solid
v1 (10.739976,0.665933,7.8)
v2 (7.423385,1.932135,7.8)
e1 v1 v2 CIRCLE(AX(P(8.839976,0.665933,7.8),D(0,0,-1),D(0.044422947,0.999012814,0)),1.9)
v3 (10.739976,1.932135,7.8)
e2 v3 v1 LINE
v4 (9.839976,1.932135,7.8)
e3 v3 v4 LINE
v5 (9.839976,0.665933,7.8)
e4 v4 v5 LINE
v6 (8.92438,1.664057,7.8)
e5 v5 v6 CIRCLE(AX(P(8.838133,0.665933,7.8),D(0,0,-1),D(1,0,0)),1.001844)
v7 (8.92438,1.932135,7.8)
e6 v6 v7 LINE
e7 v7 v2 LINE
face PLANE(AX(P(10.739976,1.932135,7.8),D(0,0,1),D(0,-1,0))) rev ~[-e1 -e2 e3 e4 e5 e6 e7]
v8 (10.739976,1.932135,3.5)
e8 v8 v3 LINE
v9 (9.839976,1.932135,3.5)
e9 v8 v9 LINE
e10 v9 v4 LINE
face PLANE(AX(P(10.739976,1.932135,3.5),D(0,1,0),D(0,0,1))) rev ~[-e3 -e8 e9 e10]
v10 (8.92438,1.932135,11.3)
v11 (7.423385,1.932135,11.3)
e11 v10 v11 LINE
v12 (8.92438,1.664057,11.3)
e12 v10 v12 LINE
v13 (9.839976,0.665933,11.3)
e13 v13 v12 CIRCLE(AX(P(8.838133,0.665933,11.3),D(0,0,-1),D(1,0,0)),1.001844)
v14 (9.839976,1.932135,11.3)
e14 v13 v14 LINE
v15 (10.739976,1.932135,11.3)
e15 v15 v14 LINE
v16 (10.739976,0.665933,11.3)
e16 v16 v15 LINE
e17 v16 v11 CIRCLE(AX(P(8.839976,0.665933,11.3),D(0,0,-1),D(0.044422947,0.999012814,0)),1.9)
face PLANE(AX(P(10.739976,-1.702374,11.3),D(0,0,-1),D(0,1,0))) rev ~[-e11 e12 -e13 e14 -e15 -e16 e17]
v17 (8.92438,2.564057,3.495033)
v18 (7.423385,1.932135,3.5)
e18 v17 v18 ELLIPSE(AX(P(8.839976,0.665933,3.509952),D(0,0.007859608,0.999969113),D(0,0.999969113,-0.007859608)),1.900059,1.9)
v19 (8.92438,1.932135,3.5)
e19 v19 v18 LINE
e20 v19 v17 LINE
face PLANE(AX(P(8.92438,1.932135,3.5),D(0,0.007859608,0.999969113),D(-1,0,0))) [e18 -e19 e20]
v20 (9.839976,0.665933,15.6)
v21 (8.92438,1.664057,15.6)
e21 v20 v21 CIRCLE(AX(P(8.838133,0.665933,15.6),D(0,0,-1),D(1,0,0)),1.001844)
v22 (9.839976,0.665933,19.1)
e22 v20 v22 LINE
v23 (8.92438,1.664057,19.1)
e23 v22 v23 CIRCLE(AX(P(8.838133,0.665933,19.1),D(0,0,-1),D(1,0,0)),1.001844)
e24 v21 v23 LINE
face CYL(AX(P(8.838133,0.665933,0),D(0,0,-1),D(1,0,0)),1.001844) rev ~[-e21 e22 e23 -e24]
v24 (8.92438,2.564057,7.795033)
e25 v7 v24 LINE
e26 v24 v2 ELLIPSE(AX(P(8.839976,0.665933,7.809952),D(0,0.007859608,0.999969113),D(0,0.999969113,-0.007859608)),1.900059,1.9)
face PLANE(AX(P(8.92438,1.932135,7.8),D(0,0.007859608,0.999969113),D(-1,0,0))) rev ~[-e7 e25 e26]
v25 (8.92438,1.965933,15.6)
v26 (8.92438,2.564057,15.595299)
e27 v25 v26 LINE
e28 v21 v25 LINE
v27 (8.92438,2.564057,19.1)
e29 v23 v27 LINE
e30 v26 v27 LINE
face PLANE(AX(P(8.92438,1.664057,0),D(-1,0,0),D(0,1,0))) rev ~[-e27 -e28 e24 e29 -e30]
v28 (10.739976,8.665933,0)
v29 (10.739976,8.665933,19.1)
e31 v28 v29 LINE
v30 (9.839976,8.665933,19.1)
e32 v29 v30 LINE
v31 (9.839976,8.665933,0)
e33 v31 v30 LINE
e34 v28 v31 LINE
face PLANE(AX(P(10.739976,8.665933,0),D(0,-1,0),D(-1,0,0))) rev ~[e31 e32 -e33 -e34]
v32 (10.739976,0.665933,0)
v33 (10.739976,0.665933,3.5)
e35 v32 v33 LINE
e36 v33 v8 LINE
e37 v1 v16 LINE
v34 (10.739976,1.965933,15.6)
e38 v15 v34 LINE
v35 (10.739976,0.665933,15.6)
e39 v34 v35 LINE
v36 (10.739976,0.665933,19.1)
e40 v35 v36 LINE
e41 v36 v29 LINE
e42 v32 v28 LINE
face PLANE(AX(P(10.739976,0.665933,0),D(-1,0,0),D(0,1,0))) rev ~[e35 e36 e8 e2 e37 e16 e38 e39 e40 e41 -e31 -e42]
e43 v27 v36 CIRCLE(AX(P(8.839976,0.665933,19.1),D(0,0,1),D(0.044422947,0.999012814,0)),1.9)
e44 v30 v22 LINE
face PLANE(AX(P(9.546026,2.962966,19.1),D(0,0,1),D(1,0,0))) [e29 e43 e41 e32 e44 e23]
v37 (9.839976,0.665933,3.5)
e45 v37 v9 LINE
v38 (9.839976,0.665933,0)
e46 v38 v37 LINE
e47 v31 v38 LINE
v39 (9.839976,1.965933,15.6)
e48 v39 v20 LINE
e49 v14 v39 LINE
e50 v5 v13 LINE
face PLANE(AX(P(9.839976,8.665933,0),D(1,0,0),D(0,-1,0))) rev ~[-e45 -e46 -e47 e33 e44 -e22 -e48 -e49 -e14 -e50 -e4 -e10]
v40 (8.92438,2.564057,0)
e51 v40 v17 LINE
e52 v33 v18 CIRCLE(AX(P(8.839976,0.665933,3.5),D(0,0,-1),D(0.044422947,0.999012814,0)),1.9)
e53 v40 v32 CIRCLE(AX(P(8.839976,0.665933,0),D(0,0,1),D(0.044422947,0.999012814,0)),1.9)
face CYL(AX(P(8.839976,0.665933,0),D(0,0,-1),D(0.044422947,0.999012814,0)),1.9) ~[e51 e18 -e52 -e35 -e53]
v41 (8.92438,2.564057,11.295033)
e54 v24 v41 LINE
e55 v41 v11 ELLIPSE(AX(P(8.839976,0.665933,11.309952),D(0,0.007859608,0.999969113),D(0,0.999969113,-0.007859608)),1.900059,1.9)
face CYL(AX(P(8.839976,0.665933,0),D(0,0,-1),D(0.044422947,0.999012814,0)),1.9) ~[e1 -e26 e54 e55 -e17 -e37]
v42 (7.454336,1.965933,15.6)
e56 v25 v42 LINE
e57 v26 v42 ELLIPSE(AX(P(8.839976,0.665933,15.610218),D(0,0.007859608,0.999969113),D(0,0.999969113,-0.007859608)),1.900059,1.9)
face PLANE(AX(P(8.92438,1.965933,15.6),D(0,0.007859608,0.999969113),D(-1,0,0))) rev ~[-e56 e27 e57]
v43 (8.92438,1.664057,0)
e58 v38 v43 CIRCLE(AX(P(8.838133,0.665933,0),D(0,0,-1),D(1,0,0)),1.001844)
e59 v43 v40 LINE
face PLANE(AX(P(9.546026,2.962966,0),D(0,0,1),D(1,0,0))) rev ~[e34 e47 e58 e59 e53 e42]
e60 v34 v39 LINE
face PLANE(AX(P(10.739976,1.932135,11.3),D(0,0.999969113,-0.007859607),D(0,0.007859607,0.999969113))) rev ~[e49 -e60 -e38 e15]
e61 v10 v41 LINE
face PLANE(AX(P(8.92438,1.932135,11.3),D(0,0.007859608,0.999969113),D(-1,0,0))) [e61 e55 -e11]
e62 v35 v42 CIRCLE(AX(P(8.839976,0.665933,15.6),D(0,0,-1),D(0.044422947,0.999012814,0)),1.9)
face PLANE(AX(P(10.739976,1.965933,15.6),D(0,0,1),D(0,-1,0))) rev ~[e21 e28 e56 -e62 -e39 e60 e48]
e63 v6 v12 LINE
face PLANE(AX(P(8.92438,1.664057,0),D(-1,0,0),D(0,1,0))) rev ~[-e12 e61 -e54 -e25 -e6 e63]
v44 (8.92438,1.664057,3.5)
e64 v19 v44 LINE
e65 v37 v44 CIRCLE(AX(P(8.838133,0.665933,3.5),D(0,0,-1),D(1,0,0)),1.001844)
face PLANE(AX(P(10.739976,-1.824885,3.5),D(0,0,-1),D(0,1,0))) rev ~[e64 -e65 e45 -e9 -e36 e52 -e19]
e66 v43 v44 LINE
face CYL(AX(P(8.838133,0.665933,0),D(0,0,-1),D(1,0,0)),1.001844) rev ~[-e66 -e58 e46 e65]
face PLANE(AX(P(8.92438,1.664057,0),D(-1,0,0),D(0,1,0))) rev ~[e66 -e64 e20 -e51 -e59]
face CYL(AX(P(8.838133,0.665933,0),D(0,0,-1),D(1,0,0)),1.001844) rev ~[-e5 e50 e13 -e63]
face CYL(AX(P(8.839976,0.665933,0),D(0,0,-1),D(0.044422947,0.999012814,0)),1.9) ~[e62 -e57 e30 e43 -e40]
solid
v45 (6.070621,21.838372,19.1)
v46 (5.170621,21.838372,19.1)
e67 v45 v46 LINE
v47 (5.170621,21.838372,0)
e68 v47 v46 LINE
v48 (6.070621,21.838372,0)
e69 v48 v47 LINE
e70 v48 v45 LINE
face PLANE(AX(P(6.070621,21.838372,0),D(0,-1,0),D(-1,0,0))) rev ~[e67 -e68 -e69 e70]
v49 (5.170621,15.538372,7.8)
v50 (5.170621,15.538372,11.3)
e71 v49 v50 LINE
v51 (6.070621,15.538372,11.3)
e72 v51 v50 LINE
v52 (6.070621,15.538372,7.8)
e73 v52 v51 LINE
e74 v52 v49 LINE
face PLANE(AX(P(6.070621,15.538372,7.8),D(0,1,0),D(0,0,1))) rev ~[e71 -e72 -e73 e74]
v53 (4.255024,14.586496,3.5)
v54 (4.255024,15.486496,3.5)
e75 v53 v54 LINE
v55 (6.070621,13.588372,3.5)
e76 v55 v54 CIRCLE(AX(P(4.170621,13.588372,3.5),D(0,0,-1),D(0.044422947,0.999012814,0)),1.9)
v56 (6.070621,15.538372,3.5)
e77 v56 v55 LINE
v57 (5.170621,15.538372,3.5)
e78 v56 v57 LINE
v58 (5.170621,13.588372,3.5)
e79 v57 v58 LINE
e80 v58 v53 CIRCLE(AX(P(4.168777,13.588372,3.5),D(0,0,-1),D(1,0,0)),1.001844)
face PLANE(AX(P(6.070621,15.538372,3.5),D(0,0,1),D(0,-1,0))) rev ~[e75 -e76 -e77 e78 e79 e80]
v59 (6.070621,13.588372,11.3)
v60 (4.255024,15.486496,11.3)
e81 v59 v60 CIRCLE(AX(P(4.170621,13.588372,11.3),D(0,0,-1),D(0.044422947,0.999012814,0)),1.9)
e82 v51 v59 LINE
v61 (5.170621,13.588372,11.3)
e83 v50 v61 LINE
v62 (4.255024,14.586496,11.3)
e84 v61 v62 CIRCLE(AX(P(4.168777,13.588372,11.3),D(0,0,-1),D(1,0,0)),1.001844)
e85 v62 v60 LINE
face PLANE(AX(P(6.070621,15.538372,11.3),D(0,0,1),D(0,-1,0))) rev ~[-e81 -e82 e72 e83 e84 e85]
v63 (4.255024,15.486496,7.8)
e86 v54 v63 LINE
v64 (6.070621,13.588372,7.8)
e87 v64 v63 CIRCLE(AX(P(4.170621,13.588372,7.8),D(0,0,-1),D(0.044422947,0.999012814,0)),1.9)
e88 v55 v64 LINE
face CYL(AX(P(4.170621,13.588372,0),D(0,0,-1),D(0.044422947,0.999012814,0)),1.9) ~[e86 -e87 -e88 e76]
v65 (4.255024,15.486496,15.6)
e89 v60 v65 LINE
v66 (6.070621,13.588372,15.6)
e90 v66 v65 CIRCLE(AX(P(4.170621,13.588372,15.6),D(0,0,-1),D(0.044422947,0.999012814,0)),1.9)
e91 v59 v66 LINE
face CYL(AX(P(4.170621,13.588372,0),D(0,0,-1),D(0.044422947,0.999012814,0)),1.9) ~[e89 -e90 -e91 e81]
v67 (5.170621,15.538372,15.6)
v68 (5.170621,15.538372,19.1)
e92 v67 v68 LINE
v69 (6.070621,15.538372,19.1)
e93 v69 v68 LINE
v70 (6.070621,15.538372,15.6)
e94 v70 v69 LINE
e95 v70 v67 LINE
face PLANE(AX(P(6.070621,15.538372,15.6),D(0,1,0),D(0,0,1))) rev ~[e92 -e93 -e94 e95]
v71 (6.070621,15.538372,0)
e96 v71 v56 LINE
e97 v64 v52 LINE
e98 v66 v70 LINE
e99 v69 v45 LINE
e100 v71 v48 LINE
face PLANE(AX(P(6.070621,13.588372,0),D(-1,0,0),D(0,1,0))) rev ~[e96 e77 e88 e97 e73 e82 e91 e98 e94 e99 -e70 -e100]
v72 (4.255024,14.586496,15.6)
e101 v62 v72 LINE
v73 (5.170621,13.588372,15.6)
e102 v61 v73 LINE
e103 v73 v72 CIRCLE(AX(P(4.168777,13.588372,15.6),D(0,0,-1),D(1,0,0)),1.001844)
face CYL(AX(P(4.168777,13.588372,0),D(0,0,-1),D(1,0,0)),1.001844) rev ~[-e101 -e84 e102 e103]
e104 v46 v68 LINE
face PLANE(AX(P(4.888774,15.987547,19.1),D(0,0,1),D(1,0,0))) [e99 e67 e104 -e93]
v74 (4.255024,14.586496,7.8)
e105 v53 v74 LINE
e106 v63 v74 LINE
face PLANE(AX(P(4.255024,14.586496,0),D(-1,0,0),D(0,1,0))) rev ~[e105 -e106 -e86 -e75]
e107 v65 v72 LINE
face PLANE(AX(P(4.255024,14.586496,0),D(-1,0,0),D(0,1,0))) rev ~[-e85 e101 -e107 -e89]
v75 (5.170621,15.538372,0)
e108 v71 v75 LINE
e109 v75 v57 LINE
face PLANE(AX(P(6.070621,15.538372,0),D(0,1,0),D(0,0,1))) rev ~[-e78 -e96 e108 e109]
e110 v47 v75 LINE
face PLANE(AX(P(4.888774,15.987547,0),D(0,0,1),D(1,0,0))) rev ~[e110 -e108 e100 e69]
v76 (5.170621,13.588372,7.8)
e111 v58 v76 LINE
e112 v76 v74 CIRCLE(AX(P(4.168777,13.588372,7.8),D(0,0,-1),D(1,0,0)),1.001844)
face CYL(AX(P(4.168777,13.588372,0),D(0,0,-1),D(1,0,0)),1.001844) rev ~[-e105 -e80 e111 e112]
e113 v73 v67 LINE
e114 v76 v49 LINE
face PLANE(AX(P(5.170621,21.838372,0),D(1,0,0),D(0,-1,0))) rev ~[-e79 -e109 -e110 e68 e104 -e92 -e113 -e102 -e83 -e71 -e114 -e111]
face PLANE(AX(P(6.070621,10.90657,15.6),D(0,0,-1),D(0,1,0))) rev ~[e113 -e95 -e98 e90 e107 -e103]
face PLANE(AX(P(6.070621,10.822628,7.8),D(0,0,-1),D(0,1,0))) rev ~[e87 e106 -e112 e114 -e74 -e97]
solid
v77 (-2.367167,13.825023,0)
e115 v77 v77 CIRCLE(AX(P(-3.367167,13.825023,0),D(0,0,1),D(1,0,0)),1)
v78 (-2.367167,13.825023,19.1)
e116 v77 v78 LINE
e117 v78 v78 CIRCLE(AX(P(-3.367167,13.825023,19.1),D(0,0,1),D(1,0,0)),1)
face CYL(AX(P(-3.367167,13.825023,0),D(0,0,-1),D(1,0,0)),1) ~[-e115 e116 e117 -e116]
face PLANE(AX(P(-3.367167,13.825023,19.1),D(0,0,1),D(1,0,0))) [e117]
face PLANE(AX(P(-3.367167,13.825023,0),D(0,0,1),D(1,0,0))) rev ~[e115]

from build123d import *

# Parameters (mm, degrees)
F1_DEPTH = 19.1
F0_R     = 1
F2_W     = 2.3683065209
F2_H     = 4.3
F2_W_2   = 2.4908180475
F3_DEPTH = 15.1081433349
F4_W     = 2.6818022196
F4_H     = 3.5
F4_W_2   = 1.95
F4_W_3   = 2.4897197326
F5_DEPTH = 10.4387875527
F6_DEPTH = 19.9954353951


with BuildPart() as f1:
    # F0 (on Top) → F1 (new body)
    with BuildSketch(Plane.XY):
        with BuildLine():
            Line((10.7399763687, 0.6659325571), (10.7399763687, 8.6659325571))
            Line((10.7399763687, 8.6659325571), (9.8399763687, 8.6659325571))
            Line((9.8399763687, 8.6659325571), (9.8399763687, 0.6659325571))
            ThreePointArc((9.8399763687, 0.6659325571), (8.0998586216, -0.0112987509), (8.9243799683, 1.664056903))
            Line((8.9243799683, 1.664056903), (8.9243799683, 2.564056903))
            ThreePointArc((8.9243799683, 2.564056903), (7.466956551, -0.647390168), (10.7399763687, 0.6659325571))
        make_face()
    extrude(amount=F1_DEPTH)

    # F2 (on face) → F3 (cut, through all)
    with BuildSketch(Plane.YZ.offset(10.7399763687)):
        with Locations((-0.5182207033, 13.45)):
            Rectangle(F2_W, F2_H)
        Polygon((1.9321352011, 11.3), (1.9659325571, 15.6), (0.6659325571, 15.6), (0.6659325571, 11.3), align=None)
        with Locations((-0.5794764666, 5.65)):
            Rectangle(F2_W_2, F2_H)
        Polygon((1.9321352011, 7.8), (0.6659325571, 7.8), (0.6659325571, 3.5), (1.9321352011, 3.5), (1.9321352011, 7.4659469537), align=None)
    extrude(amount=-F3_DEPTH, mode=Mode.SUBTRACT)

    # F6 (cut, through all): faces of the model
    f6_faces = [f1.faces().sort_by_distance(p)[0] for p in [
        (8.1815308669, 1.9489752068, 13.4425351912),
        (8.1738825267, 1.9321352011, 5.65),
    ]]
    extrude(f6_faces, amount=-F6_DEPTH, dir=(0, -0.9999691128, 0.0078596075), mode=Mode.SUBTRACT)


with BuildPart() as f1b:
    # F0 (on Top) → F1, piece 2 (new body)
    with BuildSketch(Plane.XY):
        with BuildLine():
            Line((6.0706205865, 13.5883718793), (6.0706205865, 21.8383718793))
            Line((6.0706205865, 21.8383718793), (5.1706205865, 21.8383718793))
            Line((5.1706205865, 21.8383718793), (5.1706205865, 13.5883718793))
            ThreePointArc((5.1706205865, 13.5883718793), (3.4305028395, 12.9111405713), (4.2550241862, 14.5864962252))
            Line((4.2550241862, 14.5864962252), (4.2550241862, 15.4864962252))
            ThreePointArc((4.2550241862, 15.4864962252), (2.7976007689, 12.2750491542), (6.0706205865, 13.5883718793))
        make_face()
    extrude(amount=F1_DEPTH)

    # F4 (on face) → F5 (cut, through all)
    with BuildSketch(Plane.YZ.offset(6.0706205865)):
        with Locations((12.2474707695, 17.35)):
            Rectangle(F4_W, F4_H)
        with Locations((14.5633718793, 17.35)):
            Rectangle(F4_W_2, F4_H)
        Polygon((13.5883718793, 7.8), (13.5883718793, 11.3), (11.9571578597, 11.3), (10.8226276934, 11.3), (10.8226276934, 7.8), (11.9571578597, 7.8), align=None)
        Polygon((15.5383718793, 7.8), (15.5383718793, 11.3), (15.3883718793, 11.3), (13.5883718793, 11.3), (13.5883718793, 7.8), (15.3883718793, 7.8), align=None)
        with Locations((12.343512013, 1.75)):
            Rectangle(F4_W_3, F4_H)
        Polygon((15.3883718793, 0), (15.5383718793, 0), (15.5383718793, 3.5), (15.3883718793, 3.5), (13.5883718793, 3.5), (13.5883718793, 0), align=None)
    extrude(amount=-F5_DEPTH, mode=Mode.SUBTRACT)


with BuildPart() as f1c:
    # F0 (on Top) → F1, piece 3 (new body)
    with BuildSketch(Plane.XY):
        with Locations((-3.3671669662, 13.8250226155)):
            Circle(F0_R)
    extrude(amount=F1_DEPTH)


solid = Compound([f1.part, f1b.part, f1c.part])
